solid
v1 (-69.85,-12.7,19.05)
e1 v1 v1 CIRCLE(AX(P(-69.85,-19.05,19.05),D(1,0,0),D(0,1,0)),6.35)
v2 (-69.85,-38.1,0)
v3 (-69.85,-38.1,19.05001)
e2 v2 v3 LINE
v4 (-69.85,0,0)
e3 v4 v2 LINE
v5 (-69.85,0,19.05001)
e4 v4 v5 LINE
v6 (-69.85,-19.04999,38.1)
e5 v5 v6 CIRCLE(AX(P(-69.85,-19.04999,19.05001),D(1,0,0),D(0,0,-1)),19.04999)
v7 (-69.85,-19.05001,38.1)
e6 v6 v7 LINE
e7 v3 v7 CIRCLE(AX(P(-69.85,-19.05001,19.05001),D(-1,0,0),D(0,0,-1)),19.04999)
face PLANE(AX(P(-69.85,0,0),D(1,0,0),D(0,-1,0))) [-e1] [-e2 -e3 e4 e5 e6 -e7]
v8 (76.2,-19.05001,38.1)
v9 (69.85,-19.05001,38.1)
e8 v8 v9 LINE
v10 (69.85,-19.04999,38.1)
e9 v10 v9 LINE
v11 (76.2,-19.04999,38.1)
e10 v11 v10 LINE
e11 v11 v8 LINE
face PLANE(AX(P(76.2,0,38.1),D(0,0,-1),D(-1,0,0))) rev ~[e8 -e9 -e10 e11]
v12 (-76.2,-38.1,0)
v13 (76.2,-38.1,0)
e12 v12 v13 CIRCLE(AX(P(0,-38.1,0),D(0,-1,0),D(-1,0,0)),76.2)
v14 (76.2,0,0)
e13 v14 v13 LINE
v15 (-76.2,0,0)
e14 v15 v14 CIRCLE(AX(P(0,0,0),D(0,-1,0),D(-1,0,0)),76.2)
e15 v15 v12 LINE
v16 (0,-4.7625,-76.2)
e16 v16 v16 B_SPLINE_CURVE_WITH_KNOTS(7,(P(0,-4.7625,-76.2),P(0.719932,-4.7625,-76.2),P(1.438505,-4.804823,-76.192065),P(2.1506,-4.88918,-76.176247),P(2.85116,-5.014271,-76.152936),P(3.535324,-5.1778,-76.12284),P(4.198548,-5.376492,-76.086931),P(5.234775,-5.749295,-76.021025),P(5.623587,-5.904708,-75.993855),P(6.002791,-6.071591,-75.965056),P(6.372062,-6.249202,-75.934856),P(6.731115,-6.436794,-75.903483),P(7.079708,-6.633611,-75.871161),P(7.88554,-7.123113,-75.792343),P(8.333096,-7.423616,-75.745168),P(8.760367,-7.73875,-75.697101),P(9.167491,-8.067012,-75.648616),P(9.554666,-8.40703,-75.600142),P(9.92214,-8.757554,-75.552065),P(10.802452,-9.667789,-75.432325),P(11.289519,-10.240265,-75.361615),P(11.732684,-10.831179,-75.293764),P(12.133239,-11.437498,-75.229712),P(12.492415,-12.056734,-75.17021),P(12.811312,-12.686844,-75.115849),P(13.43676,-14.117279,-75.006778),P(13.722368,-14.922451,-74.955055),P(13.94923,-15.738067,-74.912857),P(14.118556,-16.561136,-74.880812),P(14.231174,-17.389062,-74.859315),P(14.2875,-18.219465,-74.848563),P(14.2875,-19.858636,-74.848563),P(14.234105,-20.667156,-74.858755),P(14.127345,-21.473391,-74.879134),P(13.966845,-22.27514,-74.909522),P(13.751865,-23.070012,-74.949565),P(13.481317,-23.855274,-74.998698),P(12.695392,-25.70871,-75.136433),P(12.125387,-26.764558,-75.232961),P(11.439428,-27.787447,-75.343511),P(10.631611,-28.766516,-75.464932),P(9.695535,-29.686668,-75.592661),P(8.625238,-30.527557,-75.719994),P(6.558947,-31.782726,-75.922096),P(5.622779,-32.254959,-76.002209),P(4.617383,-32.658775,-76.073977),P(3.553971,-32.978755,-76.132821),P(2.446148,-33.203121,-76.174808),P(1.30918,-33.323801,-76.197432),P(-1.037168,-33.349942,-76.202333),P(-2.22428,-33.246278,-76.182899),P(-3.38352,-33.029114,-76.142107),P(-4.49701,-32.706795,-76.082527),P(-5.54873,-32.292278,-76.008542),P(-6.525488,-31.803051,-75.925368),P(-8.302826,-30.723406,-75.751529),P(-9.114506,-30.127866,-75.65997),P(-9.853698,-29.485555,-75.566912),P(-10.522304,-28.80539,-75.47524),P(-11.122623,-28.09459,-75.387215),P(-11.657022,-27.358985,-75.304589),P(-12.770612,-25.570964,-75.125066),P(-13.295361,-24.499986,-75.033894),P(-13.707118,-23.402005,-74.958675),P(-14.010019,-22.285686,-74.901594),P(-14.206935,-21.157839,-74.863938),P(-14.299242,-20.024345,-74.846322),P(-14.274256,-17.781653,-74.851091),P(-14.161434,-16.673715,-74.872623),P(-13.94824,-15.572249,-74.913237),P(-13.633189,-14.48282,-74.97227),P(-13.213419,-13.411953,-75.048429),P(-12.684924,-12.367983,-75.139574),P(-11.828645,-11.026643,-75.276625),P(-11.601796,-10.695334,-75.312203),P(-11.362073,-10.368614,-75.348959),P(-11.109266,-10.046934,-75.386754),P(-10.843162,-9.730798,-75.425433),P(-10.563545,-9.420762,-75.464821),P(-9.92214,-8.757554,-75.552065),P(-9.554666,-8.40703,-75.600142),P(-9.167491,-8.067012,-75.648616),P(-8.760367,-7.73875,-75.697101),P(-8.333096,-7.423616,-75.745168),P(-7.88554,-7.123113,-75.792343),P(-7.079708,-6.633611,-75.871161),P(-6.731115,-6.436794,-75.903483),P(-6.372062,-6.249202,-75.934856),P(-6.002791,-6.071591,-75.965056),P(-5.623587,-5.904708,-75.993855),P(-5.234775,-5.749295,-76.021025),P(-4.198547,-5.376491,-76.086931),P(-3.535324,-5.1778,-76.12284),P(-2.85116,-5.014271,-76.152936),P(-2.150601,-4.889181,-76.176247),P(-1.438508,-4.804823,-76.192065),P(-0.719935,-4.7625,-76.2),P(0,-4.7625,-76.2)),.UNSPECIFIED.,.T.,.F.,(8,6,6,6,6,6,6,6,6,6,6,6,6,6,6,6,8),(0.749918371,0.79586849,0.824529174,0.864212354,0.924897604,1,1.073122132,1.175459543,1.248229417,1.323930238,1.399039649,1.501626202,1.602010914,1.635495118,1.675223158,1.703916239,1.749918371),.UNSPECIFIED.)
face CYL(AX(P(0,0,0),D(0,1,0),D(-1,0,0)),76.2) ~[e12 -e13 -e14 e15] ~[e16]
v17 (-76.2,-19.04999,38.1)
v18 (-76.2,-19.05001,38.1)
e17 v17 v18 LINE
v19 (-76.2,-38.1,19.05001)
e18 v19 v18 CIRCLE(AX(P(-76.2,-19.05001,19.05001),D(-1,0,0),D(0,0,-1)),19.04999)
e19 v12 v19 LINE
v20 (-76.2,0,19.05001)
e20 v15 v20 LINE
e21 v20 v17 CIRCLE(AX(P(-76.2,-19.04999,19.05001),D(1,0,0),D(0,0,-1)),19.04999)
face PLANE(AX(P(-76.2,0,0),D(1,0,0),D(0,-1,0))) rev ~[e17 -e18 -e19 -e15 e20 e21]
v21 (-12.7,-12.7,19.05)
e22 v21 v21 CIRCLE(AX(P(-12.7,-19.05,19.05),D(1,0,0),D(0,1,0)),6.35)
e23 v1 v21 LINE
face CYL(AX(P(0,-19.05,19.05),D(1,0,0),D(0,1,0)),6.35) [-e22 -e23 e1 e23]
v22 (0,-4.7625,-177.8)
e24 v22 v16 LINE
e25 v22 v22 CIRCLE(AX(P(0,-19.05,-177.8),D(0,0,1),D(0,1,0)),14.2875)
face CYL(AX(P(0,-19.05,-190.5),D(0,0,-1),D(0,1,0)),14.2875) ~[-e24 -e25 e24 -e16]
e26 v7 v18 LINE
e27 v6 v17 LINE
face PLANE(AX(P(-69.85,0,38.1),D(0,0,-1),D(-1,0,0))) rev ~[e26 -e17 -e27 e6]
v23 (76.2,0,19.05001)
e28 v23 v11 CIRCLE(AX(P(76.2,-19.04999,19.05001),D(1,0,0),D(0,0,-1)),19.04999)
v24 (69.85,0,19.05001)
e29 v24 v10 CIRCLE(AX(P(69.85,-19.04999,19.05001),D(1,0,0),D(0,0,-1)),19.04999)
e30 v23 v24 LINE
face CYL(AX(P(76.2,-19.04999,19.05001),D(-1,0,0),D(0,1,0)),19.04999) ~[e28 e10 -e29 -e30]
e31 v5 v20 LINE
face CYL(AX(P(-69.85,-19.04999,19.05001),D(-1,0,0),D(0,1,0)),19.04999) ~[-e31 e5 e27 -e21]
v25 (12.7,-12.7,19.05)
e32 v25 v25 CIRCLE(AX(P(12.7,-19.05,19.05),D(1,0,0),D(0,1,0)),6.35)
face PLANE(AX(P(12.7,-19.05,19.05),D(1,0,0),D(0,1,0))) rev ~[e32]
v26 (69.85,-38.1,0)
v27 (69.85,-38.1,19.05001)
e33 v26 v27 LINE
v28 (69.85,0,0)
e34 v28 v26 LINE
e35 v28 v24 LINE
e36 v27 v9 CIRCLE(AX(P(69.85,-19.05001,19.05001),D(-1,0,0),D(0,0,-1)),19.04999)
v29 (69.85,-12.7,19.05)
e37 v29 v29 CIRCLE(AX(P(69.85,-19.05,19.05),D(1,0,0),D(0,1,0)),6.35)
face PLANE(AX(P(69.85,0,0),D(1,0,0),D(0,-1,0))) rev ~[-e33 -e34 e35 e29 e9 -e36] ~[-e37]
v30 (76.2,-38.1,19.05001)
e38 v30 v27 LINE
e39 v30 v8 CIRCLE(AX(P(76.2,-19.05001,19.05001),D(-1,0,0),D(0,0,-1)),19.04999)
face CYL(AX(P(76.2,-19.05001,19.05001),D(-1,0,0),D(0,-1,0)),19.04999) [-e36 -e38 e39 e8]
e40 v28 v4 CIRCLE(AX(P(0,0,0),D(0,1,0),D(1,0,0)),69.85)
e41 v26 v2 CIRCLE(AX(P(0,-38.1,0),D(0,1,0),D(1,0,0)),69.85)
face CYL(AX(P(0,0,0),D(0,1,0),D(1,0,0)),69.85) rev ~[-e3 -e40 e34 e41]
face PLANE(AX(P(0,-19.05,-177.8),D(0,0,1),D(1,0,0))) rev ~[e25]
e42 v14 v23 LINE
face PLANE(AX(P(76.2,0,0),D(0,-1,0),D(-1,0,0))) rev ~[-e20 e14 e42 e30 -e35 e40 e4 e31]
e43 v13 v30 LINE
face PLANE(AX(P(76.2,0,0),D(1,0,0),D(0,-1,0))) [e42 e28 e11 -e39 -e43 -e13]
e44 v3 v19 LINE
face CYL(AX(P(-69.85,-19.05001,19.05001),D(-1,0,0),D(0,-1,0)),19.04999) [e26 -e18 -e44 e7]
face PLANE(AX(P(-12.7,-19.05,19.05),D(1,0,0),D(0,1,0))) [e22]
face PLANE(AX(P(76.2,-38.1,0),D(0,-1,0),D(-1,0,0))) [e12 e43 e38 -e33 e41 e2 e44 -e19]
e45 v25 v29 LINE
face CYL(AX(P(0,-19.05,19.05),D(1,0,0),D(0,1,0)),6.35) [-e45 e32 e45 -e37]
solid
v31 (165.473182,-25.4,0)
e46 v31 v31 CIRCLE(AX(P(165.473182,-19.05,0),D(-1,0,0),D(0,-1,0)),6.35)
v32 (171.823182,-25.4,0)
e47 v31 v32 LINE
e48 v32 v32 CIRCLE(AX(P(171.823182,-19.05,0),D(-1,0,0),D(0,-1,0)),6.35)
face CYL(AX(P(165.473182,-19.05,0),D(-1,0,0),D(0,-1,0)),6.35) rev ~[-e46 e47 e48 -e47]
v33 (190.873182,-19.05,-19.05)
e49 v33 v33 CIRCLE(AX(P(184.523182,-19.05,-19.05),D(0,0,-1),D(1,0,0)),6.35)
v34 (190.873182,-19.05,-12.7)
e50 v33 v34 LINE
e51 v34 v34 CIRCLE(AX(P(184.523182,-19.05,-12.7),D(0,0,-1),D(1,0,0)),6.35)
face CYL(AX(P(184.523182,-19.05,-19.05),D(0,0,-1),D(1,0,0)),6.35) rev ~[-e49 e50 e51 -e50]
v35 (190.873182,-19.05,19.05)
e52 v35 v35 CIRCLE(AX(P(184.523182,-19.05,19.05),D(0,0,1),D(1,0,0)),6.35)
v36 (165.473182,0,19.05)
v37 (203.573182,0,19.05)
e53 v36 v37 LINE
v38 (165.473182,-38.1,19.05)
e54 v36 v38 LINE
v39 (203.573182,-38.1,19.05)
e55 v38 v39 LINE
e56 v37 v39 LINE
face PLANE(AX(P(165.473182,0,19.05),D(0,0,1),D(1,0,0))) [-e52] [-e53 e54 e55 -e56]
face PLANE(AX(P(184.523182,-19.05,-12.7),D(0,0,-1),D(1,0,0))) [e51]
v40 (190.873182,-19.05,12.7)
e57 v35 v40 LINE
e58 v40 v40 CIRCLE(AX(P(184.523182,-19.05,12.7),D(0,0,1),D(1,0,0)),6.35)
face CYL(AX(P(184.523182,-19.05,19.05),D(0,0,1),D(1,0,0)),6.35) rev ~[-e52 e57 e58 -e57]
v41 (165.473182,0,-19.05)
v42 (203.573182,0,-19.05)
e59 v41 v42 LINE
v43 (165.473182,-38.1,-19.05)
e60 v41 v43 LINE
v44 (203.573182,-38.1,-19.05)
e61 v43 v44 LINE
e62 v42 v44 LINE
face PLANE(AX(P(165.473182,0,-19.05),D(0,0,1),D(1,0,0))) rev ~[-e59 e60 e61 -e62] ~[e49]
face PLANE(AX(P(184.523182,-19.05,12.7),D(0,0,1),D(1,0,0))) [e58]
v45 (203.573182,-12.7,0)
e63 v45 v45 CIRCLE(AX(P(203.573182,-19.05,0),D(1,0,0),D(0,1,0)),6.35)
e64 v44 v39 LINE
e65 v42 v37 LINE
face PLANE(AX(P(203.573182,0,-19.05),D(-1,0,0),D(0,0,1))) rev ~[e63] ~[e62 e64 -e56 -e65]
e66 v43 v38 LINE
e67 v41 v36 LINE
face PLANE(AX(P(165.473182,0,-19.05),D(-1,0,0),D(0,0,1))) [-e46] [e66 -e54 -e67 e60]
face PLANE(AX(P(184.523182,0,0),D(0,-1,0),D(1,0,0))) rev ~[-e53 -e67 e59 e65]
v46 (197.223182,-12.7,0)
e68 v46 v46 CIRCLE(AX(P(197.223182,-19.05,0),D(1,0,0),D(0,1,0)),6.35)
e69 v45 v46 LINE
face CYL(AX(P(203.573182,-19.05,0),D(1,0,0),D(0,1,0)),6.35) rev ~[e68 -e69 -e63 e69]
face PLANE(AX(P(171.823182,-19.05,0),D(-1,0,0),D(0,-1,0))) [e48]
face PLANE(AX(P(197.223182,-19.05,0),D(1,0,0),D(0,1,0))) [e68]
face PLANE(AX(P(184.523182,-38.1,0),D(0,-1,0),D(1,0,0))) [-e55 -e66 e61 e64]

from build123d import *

# Parameters (mm, degrees)
F1_DEPTH  = 38.1
F2_DEPTH  = 38.1
F3_R      = 19.04999
F4_R      = 6.35
F5_DEPTH  = 69.85
F6_R      = 6.35
F7_DEPTH  = 12.7
F10_DEPTH = 115.6514373633
F11_DEPTH = 12.7
F12_W     = 38.1
F12_H     = 38.1
F13_DEPTH = 38.1
F14_R     = 6.35
F15_DEPTH = 6.35
F16_R     = 6.35
F17_DEPTH = 6.35
F18_R     = 6.35
F19_DEPTH = 6.35
F20_R     = 6.35
F21_DEPTH = 6.35


# Not quite as in the source:
# - a fillet or chamfer is up to 0.001 mm smaller than in the source, because OpenCascade refuses the exact size


with BuildPart() as f1:
    # F0 (on Front) → F1 (new body)
    with BuildSketch(Plane.XZ):
        with BuildLine():
            Line((-69.85, 0), (-76.2, 0))
            ThreePointArc((-76.2, 0), (0, -76.2), (76.2, 0))
            Line((76.2, 0), (69.85, 0))
            ThreePointArc((69.85, 0), (0, -69.85), (-69.85, 0))
        make_face()
    extrude(amount=F1_DEPTH)

    # F2 (add): faces of the model
    f2_faces = [f1.faces().sort_by_distance(p)[0] for p in [
        (73.025, -19.05, 0),
        (-73.025, -19.05, 0),
    ]]
    extrude(f2_faces, amount=F2_DEPTH)

    # F3 (radius 19.05 in the source; OpenCascade refuses exactly that, so slightly less here)
    f3_edges = [f1.edges().sort_by_distance(p)[0] for p in [
        (73.025, -38.1, 38.1),
        (73.025, 0, 38.1),
        (-73.025, 0, 38.1),
        (-73.025, -38.1, 38.1),
    ]]
    fillet(f3_edges, radius=F3_R)

    # F4 (on Right) → F5 (join, symmetric)
    with BuildSketch(Plane.YZ):
        with Locations((-19.05, 19.05)):
            Circle(F4_R)
    extrude(amount=F5_DEPTH, both=True)

    # F6 (on Right) → F7 (cut, symmetric)
    with BuildSketch(Plane.YZ):
        with Locations((-19.05, 19.05)):
            Circle(F6_R)
    extrude(amount=F7_DEPTH, both=True, mode=Mode.SUBTRACT)

    # F9 (on offset) → F10 (join, through all)
    with BuildSketch(Plane.XY.offset(-190.5)):
        with BuildLine():
            ThreePointArc((14.2875, -19.05), (10.1027881362, -8.9472118638), (0, -4.7625))
            ThreePointArc((0, -4.7625), (-10.1027881362, -29.1527881362), (14.2875, -19.05))
        make_face()
    extrude(amount=F10_DEPTH)

    # F11 (cut): a face of the model
    f11_faces = [f1.faces().sort_by_distance(p)[0] for p in [
        (0, -19.05, -190.5),
    ]]
    extrude(f11_faces, amount=-F11_DEPTH, mode=Mode.SUBTRACT)


with BuildPart() as f13:
    # F12 (on Front) → F13 (new body)
    with BuildSketch(Plane.XZ):
        with Locations((184.5231820917, 0)):
            Rectangle(F12_W, F12_H)
    extrude(amount=F13_DEPTH)

    # F14 (on face) → F15 (cut)
    with BuildSketch(Plane.YZ.offset(203.5731820917)):
        with Locations((-19.05, 0)):
            Circle(F14_R)
    extrude(amount=-F15_DEPTH, mode=Mode.SUBTRACT)

    # F16 (on face) → F17 (cut)
    with BuildSketch(Plane(origin=(165.4731820917, 0, 0), x_dir=(0, -1, 0), z_dir=(-1, 0, 0))):
        with Locations((19.05, 0)):
            Circle(F16_R)
    extrude(amount=-F17_DEPTH, mode=Mode.SUBTRACT)

    # F18 (on face) → F19 (cut)
    with BuildSketch(Plane.XY.offset(19.05)):
        with Locations((184.5231820917, -19.05)):
            Circle(F18_R)
    extrude(amount=-F19_DEPTH, mode=Mode.SUBTRACT)

    # F20 (on face) → F21 (cut)
    with BuildSketch(Plane(origin=(0, 0, -19.05), x_dir=(1, 0, 0), z_dir=(0, 0, -1))):
        with Locations((184.5231820917, 19.05)):
            Circle(F20_R)
    extrude(amount=-F21_DEPTH, mode=Mode.SUBTRACT)


solid = Compound([f1.part, f13.part])
